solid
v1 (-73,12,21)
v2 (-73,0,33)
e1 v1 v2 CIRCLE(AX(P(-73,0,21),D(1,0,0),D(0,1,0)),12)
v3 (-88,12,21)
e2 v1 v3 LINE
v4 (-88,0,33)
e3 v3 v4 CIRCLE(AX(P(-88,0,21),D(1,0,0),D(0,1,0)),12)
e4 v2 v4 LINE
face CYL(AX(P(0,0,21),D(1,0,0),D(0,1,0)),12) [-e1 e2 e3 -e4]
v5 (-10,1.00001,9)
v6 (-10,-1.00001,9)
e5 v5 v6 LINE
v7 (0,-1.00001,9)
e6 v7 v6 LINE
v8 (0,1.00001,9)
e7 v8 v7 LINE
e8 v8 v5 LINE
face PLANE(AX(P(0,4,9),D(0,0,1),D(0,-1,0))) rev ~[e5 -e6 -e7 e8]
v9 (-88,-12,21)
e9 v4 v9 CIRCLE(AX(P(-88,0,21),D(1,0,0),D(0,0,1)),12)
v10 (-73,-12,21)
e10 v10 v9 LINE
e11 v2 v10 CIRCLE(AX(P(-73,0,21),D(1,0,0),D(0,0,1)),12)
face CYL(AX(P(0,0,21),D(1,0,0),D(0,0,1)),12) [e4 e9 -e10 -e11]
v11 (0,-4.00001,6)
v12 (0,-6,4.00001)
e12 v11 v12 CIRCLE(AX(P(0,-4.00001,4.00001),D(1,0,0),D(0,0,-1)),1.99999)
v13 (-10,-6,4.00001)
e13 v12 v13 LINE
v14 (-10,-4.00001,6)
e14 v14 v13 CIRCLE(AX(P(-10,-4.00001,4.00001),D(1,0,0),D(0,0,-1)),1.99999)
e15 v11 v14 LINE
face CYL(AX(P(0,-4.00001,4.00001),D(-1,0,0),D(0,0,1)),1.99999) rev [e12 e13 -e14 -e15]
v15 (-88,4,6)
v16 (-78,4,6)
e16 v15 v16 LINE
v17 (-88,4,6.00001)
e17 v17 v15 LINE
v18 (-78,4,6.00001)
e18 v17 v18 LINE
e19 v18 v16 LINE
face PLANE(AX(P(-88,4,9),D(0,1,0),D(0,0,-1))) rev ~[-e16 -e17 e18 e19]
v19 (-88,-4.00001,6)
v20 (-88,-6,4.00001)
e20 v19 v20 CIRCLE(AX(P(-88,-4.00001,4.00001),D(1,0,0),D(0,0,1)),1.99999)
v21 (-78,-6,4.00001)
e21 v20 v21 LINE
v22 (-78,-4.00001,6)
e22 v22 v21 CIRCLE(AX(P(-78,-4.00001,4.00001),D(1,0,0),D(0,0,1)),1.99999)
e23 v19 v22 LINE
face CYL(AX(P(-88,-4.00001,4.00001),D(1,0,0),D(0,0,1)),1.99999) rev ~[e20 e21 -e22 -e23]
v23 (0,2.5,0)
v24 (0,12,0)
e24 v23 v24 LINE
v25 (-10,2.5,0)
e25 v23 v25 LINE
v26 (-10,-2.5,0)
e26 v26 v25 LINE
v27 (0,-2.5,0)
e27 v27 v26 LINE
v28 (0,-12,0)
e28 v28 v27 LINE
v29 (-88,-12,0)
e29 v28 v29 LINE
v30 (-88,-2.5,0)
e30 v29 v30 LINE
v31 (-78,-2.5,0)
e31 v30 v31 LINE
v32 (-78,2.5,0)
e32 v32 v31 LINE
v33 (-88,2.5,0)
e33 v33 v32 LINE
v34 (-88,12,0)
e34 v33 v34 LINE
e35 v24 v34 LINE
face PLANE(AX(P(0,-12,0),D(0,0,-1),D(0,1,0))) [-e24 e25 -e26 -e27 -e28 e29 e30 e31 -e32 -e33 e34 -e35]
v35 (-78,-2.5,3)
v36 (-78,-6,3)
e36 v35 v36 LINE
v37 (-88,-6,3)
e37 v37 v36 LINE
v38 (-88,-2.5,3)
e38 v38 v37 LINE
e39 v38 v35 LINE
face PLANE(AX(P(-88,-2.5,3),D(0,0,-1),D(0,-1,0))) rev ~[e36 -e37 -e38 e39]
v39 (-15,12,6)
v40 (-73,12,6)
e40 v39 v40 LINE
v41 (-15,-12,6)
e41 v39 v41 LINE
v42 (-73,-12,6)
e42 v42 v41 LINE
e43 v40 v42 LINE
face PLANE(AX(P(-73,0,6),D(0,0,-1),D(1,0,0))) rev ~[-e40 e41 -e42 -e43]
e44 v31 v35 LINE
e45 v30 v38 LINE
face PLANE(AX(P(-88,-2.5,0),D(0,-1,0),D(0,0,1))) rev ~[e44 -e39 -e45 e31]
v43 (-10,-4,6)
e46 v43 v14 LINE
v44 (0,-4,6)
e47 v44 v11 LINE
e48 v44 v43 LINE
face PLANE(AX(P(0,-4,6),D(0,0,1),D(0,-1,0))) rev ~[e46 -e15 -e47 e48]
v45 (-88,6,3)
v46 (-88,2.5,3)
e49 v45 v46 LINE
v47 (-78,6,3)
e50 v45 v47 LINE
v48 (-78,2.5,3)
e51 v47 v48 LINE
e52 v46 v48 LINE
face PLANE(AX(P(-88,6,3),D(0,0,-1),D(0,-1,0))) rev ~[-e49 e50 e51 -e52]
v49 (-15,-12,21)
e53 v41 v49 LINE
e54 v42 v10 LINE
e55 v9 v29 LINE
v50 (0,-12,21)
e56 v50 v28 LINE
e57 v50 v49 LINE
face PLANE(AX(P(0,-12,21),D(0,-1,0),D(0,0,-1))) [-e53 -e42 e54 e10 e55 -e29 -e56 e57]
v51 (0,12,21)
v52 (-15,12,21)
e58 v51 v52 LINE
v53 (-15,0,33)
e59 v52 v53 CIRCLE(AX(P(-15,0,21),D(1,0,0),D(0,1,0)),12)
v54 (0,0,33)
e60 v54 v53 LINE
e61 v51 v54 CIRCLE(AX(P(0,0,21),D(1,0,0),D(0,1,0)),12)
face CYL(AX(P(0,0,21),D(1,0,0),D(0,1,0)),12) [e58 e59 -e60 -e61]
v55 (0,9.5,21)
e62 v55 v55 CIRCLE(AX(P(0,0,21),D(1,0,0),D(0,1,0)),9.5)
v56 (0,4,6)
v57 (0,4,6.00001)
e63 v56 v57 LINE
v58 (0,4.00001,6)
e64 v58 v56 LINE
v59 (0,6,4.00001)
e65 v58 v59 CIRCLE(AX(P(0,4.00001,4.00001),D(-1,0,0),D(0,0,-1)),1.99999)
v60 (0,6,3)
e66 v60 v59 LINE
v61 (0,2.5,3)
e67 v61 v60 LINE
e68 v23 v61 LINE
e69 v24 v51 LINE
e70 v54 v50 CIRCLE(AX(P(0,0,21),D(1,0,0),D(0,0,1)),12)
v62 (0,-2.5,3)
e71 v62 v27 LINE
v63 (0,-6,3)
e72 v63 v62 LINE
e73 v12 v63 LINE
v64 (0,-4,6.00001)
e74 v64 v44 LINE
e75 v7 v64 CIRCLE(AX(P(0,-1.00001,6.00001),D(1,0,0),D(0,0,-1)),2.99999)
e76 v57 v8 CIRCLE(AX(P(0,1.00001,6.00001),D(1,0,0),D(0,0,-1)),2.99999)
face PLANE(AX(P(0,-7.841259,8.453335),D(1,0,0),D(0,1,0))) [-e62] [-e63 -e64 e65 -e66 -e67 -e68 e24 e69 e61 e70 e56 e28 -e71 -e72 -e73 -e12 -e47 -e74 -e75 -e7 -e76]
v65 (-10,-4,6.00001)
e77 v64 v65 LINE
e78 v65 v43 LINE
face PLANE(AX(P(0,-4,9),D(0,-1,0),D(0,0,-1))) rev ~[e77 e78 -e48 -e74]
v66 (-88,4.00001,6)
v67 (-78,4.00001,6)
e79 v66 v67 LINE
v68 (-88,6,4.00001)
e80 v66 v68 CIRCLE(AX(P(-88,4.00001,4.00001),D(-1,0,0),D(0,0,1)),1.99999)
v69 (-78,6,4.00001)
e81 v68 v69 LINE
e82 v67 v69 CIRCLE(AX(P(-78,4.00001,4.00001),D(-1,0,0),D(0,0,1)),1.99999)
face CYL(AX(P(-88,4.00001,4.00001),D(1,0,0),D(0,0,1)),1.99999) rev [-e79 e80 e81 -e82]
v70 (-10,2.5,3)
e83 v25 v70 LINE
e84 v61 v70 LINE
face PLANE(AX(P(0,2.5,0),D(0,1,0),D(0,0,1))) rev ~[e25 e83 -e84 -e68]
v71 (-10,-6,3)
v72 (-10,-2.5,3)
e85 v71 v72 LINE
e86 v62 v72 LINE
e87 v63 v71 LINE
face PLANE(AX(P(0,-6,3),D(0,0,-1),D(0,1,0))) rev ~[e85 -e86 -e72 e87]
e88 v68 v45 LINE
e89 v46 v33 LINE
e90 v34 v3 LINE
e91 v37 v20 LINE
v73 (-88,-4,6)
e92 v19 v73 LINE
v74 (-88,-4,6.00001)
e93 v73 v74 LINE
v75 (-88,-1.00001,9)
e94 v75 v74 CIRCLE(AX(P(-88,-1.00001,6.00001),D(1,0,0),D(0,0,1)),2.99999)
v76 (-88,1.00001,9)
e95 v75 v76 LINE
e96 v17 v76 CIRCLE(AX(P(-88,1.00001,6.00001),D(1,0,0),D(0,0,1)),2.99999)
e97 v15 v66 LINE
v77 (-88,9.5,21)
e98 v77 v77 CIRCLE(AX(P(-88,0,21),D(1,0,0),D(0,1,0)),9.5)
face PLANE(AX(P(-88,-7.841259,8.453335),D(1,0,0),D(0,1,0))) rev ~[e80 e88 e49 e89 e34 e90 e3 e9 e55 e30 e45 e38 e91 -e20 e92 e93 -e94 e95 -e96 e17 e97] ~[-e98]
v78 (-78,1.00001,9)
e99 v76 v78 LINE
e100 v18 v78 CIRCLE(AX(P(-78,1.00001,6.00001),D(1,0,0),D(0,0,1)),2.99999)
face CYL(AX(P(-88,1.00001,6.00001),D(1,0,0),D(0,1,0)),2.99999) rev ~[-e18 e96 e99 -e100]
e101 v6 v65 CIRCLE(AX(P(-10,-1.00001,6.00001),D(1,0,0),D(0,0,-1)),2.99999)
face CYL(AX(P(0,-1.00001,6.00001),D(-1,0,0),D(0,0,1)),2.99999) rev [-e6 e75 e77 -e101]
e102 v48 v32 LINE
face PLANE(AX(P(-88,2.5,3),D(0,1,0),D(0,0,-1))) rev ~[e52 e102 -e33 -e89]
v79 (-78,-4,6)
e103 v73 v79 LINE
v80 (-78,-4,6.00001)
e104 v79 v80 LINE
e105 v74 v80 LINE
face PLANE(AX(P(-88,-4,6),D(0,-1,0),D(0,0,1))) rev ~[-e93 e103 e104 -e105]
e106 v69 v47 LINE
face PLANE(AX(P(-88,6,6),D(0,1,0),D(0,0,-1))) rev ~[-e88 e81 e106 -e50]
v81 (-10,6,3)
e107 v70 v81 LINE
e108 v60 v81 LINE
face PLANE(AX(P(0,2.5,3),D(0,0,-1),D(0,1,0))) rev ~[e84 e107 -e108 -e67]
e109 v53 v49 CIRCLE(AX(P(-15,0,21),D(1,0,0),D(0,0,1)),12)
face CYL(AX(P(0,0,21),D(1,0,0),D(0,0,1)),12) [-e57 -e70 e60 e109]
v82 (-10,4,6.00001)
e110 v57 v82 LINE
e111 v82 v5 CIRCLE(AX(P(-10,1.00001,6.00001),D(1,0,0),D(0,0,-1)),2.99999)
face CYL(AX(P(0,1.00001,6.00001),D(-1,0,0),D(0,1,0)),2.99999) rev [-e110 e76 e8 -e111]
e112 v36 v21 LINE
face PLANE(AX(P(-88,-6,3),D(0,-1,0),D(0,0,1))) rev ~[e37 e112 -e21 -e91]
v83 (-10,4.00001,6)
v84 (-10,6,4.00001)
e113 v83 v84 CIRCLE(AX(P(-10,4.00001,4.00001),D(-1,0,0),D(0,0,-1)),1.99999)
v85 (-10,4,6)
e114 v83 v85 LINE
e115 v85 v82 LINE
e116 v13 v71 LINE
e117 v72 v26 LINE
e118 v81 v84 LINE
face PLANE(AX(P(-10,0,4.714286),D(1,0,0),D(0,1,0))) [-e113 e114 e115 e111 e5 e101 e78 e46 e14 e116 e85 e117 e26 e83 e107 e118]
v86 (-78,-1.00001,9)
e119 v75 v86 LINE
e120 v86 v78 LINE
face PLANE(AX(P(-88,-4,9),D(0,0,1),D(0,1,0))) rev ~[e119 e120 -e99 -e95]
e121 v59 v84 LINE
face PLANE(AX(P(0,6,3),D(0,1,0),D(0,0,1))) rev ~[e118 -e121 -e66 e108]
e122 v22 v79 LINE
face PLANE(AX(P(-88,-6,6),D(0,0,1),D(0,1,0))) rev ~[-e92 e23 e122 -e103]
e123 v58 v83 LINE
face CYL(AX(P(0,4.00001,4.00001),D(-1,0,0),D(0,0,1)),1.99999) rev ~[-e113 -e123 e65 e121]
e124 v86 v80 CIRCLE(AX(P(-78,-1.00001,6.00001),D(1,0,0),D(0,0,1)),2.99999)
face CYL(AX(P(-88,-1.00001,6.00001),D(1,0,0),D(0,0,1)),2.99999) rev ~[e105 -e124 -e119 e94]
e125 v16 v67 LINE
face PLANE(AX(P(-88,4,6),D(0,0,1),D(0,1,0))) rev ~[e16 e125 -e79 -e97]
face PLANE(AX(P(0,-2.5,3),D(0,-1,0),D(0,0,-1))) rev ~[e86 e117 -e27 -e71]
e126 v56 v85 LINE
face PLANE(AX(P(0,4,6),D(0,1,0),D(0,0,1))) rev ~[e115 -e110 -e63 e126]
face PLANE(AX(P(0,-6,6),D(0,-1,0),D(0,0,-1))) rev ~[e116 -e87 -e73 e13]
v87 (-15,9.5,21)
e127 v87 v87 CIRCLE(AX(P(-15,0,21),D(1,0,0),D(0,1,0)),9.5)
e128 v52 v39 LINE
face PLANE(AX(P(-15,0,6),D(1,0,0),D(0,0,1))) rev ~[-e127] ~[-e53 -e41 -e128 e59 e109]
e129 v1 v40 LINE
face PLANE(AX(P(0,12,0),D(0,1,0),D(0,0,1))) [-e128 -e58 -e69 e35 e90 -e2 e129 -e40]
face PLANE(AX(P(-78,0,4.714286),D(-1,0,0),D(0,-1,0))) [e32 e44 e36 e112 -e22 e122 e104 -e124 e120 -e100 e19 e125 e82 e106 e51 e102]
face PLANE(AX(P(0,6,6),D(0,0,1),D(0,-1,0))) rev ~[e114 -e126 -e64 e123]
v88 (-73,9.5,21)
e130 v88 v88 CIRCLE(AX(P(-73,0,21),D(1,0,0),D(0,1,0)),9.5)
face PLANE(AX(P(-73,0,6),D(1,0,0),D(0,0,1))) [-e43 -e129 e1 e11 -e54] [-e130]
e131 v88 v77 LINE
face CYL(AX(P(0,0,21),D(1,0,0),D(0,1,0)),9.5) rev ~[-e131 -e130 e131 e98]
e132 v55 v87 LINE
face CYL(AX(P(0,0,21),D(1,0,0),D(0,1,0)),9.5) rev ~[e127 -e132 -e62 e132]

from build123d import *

# Parameters (mm, degrees)
F0_R     = 9.5
F1_DEPTH = 88
F2_W     = 58
F2_H     = 27
F3_DEPTH = 12.5
F4_DEPTH = 10
F6_DEPTH = 10
F7_R     = 2.99999
F8_R     = 1.99999


# Not quite as in the source:
# - a fillet or chamfer is up to 0.001 mm smaller than in the source, because OpenCascade refuses the exact size


with BuildPart() as f1:
    # F0 (on Right) → F1 (new body)
    with BuildSketch(Plane.YZ):
        with BuildLine():
            ThreePointArc((0, 9), (-8.4852813742, 12.5147186258), (-12, 21))
            Line((-12, 21), (-12, 0))
            Line((-12, 0), (-2.5, 0))
            Line((-2.5, 0), (-2.5, 3))
            Line((-2.5, 3), (-6, 3))
            Line((-6, 3), (-6, 6))
            Line((-6, 6), (-4, 6))
            Line((-4, 6), (-4, 9))
            Line((-4, 9), (0, 9))
        make_face()
        Polygon((4, 9), (0, 9), (-4, 9), (-4, 6), (-6, 6), (-6, 3), (-2.5, 3), (-2.5, 0), (2.5, 0), (2.5, 3), (6, 3), (6, 6), (4, 6), align=None)
        with BuildLine():
            Line((12, 0), (12, 21))
            ThreePointArc((12, 21), (8.4852813742, 12.5147186258), (0, 9))
            Line((0, 9), (4, 9))
            Line((4, 9), (4, 6))
            Line((4, 6), (6, 6))
            Line((6, 6), (6, 3))
            Line((6, 3), (2.5, 3))
            Line((2.5, 3), (2.5, 0))
            Line((2.5, 0), (12, 0))
        make_face()
        with BuildLine():
            ThreePointArc((12, 21), (8.4852813742, 29.4852813742), (0, 33))
            ThreePointArc((0, 33), (-8.4852813742, 29.4852813742), (-12, 21))
            ThreePointArc((-12, 21), (-8.4852813742, 12.5147186258), (0, 9))
            ThreePointArc((0, 9), (8.4852813742, 12.5147186258), (12, 21))
        make_face()
        with Locations((0, 21)):
            Circle(F0_R, mode=Mode.SUBTRACT)
    extrude(amount=-F1_DEPTH)

    # F2 (on Front) → F3 (cut, symmetric)
    with BuildSketch(Plane.XZ):
        with Locations((-44, 19.5)):
            Rectangle(F2_W, F2_H)
    extrude(amount=F3_DEPTH, both=True, mode=Mode.SUBTRACT)

    # F0 (on Right) → F4 (cut)
    with BuildSketch(Plane.YZ):
        Polygon((4, 9), (0, 9), (-4, 9), (-4, 6), (-6, 6), (-6, 3), (-2.5, 3), (-2.5, 0), (2.5, 0), (2.5, 3), (6, 3), (6, 6), (4, 6), align=None)
    extrude(amount=-F4_DEPTH, mode=Mode.SUBTRACT)

    # F5 (on face) → F6 (cut)
    with BuildSketch(Plane(origin=(-88, 0, 0), x_dir=(0, -1, 0), z_dir=(-1, 0, 0))):
        Polygon((-2.5, 3), (-2.5, 0), (2.5, 0), (2.5, 3), (6, 3), (6, 6), (4, 6), (4, 9), (0, 9), (-4, 9), (-4, 6), (-6, 6), (-6, 3), align=None)
    extrude(amount=-F6_DEPTH, mode=Mode.SUBTRACT)

    # F7 (radius 3 in the source; OpenCascade refuses exactly that, so slightly less here)
    f7_edges = [f1.edges().sort_by_distance(p)[0] for p in [
        (-83, 4, 9),
        (-83, -4, 9),
        (-5, -4, 9),
        (-5, 4, 9),
    ]]
    fillet(f7_edges, radius=F7_R)

    # F8 (radius 2 in the source; OpenCascade refuses exactly that, so slightly less here)
    f8_edges = [f1.edges().sort_by_distance(p)[0] for p in [
        (-83, -6, 6),
        (-83, 6, 6),
        (-5, 6, 6),
        (-5, -6, 6),
    ]]
    fillet(f8_edges, radius=F8_R)


solid = f1.part
